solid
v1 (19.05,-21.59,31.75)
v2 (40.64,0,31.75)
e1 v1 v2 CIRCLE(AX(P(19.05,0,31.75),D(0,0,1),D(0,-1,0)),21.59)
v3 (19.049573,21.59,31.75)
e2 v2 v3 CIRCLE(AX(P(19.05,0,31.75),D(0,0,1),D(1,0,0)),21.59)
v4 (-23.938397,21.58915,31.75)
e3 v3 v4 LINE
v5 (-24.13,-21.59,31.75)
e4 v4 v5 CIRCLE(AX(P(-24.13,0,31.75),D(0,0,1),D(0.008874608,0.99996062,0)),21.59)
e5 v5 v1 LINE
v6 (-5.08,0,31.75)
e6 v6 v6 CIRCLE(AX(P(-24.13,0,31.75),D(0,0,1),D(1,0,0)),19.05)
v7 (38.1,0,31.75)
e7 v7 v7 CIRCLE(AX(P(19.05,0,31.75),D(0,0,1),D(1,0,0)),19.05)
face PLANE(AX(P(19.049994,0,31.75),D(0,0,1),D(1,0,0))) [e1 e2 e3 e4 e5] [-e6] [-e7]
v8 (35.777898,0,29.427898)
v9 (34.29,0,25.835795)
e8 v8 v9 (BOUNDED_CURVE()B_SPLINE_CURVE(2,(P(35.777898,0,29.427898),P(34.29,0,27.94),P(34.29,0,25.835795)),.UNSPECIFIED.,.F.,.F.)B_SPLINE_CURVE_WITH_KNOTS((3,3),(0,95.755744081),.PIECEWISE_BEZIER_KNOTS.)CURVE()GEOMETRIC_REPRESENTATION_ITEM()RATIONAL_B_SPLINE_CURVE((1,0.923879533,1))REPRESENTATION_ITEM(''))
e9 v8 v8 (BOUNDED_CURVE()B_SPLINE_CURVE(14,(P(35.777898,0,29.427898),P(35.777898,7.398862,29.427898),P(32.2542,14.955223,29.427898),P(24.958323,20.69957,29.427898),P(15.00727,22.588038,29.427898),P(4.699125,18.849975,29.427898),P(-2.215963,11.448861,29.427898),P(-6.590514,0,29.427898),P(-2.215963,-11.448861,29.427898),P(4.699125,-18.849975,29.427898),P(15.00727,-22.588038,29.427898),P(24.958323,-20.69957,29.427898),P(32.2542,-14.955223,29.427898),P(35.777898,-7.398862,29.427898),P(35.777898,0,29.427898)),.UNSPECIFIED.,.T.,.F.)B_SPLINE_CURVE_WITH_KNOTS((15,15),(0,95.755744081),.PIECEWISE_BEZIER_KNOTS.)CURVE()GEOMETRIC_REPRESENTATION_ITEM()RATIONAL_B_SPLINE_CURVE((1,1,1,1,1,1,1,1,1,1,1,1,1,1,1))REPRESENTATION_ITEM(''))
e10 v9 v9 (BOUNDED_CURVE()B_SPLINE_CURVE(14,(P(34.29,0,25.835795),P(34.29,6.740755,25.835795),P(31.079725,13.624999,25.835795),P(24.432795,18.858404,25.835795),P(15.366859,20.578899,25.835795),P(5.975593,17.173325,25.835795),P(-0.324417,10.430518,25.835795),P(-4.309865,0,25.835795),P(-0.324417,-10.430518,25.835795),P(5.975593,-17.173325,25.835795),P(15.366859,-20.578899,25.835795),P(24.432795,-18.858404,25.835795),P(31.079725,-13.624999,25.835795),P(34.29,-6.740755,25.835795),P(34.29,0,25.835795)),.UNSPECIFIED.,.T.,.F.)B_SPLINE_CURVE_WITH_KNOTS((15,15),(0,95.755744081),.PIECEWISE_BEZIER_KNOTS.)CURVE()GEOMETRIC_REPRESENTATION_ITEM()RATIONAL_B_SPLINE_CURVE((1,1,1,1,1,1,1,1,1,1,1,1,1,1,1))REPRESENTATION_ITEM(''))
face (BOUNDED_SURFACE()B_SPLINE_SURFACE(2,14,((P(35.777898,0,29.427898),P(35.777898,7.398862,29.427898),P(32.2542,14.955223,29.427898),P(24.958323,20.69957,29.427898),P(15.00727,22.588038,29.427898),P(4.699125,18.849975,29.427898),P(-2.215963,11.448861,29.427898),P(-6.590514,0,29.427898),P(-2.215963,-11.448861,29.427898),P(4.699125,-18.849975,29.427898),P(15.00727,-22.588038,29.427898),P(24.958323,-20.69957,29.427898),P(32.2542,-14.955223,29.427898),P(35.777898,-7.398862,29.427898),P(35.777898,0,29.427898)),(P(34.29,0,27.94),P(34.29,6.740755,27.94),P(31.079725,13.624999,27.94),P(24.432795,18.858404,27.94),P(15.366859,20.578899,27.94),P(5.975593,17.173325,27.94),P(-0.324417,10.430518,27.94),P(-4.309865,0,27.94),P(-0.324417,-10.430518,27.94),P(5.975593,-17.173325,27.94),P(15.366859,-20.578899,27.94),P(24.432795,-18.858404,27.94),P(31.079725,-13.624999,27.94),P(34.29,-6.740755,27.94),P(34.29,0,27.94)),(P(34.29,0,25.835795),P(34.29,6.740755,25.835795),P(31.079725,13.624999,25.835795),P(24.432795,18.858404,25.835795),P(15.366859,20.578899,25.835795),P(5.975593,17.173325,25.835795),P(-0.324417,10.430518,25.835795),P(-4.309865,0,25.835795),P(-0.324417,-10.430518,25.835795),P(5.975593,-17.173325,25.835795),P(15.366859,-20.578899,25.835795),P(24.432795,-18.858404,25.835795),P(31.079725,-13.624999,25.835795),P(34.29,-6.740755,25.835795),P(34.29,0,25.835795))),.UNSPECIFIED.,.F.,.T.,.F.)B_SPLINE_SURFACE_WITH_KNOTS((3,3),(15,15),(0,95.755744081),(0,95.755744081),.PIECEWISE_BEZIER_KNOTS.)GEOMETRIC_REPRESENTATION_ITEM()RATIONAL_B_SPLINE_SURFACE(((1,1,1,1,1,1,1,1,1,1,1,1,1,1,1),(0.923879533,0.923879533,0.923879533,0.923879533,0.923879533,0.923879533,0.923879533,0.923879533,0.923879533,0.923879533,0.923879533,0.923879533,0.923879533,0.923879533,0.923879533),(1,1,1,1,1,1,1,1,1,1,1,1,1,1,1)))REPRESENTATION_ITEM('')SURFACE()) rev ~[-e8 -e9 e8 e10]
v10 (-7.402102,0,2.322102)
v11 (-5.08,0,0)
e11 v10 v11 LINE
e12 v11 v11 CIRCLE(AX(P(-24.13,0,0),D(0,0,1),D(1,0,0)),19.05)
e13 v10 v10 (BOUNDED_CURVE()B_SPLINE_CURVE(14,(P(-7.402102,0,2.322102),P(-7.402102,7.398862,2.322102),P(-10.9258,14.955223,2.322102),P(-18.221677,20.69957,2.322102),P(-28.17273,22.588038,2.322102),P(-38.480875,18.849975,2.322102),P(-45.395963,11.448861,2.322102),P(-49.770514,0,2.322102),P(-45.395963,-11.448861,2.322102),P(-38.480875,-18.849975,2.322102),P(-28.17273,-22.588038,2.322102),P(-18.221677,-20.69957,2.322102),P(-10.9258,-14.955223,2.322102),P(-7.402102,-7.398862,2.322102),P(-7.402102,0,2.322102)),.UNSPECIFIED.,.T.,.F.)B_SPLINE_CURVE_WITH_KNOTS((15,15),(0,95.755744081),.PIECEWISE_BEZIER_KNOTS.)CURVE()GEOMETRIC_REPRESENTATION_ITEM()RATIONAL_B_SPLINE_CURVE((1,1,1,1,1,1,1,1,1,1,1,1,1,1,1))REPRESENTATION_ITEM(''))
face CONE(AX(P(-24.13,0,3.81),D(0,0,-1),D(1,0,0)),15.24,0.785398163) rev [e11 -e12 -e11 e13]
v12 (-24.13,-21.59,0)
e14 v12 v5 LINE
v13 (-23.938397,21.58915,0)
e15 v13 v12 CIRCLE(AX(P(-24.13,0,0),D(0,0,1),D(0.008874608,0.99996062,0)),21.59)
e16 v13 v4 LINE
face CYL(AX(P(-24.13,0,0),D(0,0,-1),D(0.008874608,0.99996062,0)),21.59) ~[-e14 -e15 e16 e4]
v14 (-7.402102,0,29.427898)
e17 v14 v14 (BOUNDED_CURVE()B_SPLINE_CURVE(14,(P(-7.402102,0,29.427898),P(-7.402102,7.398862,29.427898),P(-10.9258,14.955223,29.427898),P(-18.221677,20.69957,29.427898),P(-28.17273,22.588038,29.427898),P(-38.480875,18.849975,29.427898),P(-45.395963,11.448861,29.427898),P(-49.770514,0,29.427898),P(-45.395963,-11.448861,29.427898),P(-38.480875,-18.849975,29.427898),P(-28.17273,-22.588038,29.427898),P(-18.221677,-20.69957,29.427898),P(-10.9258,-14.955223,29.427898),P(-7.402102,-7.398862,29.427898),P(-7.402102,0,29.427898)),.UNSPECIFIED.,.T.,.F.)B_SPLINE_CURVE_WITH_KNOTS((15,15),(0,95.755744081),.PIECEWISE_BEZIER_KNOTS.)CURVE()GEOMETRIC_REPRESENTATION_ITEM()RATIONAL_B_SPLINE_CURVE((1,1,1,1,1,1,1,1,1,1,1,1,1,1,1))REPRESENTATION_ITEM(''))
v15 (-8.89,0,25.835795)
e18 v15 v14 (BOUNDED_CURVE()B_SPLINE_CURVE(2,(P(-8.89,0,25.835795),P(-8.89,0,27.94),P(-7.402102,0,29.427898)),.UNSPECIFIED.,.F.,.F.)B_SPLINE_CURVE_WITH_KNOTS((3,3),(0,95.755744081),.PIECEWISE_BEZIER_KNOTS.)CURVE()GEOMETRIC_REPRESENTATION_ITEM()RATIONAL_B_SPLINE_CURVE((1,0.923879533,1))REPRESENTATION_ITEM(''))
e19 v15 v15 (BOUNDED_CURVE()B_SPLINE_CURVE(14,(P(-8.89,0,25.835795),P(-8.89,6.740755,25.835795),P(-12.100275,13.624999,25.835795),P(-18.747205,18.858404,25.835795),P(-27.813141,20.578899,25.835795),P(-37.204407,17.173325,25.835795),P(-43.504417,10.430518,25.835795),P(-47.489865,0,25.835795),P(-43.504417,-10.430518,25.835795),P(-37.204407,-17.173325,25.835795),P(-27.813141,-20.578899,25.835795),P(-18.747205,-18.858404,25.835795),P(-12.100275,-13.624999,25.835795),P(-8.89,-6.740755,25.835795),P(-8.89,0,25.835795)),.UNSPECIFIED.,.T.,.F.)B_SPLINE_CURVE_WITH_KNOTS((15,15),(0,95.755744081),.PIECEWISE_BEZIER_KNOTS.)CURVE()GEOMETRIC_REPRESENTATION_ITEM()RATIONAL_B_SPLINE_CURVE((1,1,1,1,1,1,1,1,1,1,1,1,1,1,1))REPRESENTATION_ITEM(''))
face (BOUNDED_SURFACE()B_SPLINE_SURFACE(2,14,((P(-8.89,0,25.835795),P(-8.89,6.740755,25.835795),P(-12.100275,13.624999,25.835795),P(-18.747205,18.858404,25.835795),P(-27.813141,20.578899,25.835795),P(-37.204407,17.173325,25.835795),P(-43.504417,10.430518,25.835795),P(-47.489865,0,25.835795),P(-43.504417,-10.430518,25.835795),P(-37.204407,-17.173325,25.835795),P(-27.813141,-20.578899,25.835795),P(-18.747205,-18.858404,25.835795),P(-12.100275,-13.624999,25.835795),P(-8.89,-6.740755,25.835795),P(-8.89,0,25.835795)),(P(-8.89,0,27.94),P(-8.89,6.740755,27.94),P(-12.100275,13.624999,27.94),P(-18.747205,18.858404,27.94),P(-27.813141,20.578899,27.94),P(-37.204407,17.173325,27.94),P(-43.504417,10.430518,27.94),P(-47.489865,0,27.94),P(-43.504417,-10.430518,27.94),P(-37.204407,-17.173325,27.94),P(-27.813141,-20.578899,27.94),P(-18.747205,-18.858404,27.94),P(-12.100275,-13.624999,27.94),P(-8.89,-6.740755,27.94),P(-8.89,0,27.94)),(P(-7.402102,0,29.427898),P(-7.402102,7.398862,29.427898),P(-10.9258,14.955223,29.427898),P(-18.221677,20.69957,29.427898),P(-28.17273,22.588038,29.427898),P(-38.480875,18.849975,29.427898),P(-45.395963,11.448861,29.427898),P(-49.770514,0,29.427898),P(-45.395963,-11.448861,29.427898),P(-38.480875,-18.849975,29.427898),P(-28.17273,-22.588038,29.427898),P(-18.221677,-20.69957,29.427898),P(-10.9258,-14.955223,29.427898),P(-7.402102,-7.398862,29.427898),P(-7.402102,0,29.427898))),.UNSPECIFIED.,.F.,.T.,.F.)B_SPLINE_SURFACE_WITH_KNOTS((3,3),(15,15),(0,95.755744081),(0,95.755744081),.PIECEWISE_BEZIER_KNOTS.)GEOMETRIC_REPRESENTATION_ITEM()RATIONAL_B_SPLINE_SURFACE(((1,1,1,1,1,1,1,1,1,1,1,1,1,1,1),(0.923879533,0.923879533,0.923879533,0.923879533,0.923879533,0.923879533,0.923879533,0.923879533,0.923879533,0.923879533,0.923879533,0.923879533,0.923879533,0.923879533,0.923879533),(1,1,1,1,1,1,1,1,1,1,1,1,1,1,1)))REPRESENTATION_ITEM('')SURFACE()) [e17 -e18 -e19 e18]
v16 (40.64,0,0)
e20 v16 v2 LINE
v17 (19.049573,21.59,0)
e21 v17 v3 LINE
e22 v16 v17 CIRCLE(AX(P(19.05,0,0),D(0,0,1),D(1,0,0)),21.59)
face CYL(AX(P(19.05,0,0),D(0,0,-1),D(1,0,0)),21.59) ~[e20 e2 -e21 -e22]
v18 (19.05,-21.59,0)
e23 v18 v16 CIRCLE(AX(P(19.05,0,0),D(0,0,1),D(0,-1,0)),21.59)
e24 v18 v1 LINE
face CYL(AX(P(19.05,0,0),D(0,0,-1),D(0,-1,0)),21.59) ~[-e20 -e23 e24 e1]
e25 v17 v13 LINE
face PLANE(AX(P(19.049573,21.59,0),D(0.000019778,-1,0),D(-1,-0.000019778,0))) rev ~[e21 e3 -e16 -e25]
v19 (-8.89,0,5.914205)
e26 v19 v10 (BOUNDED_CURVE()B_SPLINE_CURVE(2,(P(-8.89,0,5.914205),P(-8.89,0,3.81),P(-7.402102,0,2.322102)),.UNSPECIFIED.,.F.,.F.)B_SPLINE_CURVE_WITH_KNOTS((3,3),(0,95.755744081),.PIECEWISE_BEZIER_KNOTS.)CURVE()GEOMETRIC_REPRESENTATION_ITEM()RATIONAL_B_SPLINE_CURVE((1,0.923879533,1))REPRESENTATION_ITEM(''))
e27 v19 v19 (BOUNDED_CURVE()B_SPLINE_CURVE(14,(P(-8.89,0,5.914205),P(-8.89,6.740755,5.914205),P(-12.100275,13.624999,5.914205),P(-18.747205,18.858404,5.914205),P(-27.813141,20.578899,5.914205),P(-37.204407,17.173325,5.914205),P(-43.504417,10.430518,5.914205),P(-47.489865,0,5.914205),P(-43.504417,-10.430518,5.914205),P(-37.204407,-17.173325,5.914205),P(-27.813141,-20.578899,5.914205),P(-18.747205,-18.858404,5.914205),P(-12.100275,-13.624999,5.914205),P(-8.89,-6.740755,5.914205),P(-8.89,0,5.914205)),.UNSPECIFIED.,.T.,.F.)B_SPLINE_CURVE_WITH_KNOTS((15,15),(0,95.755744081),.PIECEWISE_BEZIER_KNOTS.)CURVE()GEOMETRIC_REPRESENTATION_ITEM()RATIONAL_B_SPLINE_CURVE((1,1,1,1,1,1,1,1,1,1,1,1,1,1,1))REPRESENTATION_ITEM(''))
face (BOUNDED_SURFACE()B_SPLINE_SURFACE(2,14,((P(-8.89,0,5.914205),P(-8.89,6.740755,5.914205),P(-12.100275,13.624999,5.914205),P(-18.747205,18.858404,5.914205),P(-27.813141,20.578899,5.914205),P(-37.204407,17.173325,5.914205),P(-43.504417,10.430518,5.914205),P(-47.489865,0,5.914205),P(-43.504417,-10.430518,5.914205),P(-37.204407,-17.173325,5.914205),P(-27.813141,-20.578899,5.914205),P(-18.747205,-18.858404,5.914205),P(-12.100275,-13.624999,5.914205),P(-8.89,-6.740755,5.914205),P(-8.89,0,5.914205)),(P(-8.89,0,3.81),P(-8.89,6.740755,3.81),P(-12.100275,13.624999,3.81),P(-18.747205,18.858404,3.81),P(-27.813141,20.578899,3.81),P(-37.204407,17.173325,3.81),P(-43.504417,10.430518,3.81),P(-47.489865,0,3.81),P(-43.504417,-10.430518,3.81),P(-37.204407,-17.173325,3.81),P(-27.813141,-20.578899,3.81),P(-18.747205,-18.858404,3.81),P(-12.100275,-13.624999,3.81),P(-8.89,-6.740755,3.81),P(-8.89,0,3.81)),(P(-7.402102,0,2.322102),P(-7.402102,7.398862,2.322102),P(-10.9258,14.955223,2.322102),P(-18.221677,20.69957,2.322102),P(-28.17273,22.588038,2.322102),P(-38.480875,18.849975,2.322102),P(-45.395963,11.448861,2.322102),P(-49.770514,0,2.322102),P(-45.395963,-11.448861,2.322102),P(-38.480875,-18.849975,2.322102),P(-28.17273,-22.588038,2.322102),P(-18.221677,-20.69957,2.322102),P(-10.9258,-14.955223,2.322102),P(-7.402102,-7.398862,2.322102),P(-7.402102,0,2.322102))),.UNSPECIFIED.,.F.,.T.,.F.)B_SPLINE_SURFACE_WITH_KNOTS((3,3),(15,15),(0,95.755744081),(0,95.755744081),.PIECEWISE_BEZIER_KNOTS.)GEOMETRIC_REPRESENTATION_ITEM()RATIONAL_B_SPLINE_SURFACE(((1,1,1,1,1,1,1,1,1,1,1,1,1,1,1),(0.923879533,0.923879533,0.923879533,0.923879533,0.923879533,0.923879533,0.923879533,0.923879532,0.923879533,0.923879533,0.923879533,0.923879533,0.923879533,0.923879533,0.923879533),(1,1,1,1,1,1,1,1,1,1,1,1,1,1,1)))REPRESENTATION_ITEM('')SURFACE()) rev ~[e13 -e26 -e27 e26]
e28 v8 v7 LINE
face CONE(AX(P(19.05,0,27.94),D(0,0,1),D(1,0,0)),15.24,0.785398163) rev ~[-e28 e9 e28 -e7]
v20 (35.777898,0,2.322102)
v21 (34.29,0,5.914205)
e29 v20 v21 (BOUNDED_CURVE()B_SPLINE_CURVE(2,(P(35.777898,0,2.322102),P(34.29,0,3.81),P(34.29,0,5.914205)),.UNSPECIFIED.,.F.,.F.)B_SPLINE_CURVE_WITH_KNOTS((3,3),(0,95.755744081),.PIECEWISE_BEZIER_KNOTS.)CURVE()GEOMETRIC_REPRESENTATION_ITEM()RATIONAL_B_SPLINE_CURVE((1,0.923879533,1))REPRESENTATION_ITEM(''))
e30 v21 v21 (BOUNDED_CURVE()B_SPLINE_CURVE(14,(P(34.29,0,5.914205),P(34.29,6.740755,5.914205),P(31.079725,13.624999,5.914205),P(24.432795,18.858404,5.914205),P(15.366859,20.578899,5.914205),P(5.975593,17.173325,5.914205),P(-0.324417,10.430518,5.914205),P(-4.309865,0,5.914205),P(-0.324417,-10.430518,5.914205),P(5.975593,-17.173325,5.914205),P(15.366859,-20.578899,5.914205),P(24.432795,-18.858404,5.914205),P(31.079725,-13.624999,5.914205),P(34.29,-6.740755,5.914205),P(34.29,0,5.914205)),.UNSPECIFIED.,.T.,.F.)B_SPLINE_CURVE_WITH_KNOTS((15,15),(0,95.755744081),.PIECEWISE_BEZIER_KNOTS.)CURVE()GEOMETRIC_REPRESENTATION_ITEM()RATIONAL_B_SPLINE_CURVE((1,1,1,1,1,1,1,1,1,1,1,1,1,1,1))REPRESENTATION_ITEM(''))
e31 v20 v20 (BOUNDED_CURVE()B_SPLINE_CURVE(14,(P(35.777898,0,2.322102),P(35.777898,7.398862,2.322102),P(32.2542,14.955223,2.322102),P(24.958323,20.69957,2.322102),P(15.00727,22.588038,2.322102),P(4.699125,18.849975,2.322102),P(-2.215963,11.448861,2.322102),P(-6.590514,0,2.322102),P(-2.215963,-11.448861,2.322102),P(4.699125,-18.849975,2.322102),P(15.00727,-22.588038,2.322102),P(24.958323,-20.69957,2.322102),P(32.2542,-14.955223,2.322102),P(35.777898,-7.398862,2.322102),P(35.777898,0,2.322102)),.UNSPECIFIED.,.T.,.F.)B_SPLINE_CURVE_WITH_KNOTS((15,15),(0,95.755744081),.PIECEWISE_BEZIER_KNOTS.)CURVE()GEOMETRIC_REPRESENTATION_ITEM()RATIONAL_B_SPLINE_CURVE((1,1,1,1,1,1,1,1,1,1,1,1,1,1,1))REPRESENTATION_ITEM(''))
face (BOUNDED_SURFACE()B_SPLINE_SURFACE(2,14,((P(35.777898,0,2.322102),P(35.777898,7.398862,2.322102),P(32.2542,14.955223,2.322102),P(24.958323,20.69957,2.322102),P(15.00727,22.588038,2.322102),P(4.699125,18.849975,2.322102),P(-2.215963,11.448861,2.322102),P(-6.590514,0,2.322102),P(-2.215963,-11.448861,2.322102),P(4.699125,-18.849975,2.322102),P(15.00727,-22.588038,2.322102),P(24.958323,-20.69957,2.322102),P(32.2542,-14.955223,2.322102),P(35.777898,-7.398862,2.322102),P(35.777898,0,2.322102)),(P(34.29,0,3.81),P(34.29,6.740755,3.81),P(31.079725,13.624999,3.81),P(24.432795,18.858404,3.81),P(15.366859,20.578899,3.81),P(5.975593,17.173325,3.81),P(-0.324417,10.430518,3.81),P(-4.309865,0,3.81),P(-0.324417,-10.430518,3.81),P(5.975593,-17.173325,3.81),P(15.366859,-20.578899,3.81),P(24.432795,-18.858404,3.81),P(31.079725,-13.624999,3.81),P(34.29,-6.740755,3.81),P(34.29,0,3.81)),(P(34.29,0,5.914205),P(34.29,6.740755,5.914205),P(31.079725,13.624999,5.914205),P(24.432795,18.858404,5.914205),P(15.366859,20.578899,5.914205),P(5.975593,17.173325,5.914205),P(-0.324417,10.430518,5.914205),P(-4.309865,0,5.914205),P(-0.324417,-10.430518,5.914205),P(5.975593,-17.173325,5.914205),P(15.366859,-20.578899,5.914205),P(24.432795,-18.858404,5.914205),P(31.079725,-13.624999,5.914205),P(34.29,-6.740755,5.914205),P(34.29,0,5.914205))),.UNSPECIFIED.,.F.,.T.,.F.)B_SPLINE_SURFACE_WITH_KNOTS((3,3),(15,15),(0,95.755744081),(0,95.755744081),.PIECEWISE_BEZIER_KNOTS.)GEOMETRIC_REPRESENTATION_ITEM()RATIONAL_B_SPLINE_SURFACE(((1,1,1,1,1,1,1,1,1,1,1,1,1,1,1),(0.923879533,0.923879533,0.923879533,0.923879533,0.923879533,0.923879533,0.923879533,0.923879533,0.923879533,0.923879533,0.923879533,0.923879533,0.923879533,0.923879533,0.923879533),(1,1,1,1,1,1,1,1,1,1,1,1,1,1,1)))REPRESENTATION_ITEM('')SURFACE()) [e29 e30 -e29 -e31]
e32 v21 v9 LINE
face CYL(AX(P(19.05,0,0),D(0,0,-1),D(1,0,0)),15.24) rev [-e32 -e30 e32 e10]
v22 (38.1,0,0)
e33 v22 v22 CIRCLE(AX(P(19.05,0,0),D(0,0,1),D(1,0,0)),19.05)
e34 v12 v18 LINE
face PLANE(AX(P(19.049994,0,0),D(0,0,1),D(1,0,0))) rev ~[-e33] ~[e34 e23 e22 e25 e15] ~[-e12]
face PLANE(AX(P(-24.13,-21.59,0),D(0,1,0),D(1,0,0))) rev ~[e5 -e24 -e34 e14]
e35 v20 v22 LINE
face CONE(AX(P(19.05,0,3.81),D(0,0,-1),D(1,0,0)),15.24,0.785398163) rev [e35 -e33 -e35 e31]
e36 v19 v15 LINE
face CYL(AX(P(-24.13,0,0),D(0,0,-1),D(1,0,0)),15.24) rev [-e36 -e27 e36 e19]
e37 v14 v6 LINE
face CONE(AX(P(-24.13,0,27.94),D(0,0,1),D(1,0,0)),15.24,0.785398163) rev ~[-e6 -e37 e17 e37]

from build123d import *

# Parameters (mm, degrees)
F0_R     = 15.24
F1_DEPTH = 31.75
F2_SIZE  = 3.81
F3_R     = 5.08


# Not quite as in the source:
# - a feature names something its author has since deleted; it is built from what else it names


with BuildPart() as f1:
    # F0 (on Top) → F1 (new body)
    with BuildSketch(Plane.XY):
        with BuildLine():
            ThreePointArc((19.05, -21.59), (34.3164354058, -15.2664354058), (40.64, 0))
            ThreePointArc((40.64, 0), (34.316284436, 15.2665863742), (19.0495729948, 21.5899999958))
            ThreePointArc((19.0495729948, 21.5899999958), (3.7834136258, 15.266284436), (-2.54, 0))
            ThreePointArc((-2.54, 0), (3.7835645942, -15.2664354058), (19.05, -21.59))
        make_face()
        with Locations((19.05, 0)):
            Circle(F0_R, mode=Mode.SUBTRACT)
        with BuildLine():
            Line((-24.13, -21.59), (19.05, -21.59))
            ThreePointArc((19.05, -21.59), (3.7835645942, -15.2664354058), (-2.54, 0))
            ThreePointArc((-2.54, 0), (-8.8635645942, -15.2664354058), (-24.13, -21.59))
        make_face()
        with BuildLine():
            ThreePointArc((-24.13, -21.59), (-8.8635645942, -15.2664354058), (-2.54, 0))
            ThreePointArc((-2.54, 0), (-8.7959724103, 15.1985426235), (-23.9383972097, 21.5891497834))
            ThreePointArc((-23.9383972097, 21.5891497834), (-45.7197874448, 0.0958023383), (-24.13, -21.59))
        make_face()
        with Locations((-24.13, 0)):
            Circle(F0_R, mode=Mode.SUBTRACT)
        with BuildLine():
            ThreePointArc((-2.54, 0), (3.7834136258, 15.266284436), (19.0495729948, 21.5899999958))
            Line((19.0495729948, 21.5899999958), (-23.9383972097, 21.5891497834))
            ThreePointArc((-23.9383972097, 21.5891497834), (-8.7959724103, 15.1985426235), (-2.54, 0))
        make_face()
    extrude(amount=F1_DEPTH)

    # F2
    f2_edges = [f1.edges().sort_by_distance(p)[0] for p in [
        (-39.37, 0, 0),
        (3.81, 0, 0),
        (3.81, 0, 31.75),
        (-39.37, 0, 31.75),
    ]]
    chamfer(f2_edges, length=F2_SIZE)

    # F3
    f3_edges = [f1.edges().sort_by_distance(p)[0] for p in [
        (-39.37, 0, 3.81),
        (-39.37, 0, 27.94),
        (3.81, 0, 27.94),
        (3.81, 0, 3.81),
    ]]
    fillet(f3_edges, radius=F3_R)


solid = f1.part
